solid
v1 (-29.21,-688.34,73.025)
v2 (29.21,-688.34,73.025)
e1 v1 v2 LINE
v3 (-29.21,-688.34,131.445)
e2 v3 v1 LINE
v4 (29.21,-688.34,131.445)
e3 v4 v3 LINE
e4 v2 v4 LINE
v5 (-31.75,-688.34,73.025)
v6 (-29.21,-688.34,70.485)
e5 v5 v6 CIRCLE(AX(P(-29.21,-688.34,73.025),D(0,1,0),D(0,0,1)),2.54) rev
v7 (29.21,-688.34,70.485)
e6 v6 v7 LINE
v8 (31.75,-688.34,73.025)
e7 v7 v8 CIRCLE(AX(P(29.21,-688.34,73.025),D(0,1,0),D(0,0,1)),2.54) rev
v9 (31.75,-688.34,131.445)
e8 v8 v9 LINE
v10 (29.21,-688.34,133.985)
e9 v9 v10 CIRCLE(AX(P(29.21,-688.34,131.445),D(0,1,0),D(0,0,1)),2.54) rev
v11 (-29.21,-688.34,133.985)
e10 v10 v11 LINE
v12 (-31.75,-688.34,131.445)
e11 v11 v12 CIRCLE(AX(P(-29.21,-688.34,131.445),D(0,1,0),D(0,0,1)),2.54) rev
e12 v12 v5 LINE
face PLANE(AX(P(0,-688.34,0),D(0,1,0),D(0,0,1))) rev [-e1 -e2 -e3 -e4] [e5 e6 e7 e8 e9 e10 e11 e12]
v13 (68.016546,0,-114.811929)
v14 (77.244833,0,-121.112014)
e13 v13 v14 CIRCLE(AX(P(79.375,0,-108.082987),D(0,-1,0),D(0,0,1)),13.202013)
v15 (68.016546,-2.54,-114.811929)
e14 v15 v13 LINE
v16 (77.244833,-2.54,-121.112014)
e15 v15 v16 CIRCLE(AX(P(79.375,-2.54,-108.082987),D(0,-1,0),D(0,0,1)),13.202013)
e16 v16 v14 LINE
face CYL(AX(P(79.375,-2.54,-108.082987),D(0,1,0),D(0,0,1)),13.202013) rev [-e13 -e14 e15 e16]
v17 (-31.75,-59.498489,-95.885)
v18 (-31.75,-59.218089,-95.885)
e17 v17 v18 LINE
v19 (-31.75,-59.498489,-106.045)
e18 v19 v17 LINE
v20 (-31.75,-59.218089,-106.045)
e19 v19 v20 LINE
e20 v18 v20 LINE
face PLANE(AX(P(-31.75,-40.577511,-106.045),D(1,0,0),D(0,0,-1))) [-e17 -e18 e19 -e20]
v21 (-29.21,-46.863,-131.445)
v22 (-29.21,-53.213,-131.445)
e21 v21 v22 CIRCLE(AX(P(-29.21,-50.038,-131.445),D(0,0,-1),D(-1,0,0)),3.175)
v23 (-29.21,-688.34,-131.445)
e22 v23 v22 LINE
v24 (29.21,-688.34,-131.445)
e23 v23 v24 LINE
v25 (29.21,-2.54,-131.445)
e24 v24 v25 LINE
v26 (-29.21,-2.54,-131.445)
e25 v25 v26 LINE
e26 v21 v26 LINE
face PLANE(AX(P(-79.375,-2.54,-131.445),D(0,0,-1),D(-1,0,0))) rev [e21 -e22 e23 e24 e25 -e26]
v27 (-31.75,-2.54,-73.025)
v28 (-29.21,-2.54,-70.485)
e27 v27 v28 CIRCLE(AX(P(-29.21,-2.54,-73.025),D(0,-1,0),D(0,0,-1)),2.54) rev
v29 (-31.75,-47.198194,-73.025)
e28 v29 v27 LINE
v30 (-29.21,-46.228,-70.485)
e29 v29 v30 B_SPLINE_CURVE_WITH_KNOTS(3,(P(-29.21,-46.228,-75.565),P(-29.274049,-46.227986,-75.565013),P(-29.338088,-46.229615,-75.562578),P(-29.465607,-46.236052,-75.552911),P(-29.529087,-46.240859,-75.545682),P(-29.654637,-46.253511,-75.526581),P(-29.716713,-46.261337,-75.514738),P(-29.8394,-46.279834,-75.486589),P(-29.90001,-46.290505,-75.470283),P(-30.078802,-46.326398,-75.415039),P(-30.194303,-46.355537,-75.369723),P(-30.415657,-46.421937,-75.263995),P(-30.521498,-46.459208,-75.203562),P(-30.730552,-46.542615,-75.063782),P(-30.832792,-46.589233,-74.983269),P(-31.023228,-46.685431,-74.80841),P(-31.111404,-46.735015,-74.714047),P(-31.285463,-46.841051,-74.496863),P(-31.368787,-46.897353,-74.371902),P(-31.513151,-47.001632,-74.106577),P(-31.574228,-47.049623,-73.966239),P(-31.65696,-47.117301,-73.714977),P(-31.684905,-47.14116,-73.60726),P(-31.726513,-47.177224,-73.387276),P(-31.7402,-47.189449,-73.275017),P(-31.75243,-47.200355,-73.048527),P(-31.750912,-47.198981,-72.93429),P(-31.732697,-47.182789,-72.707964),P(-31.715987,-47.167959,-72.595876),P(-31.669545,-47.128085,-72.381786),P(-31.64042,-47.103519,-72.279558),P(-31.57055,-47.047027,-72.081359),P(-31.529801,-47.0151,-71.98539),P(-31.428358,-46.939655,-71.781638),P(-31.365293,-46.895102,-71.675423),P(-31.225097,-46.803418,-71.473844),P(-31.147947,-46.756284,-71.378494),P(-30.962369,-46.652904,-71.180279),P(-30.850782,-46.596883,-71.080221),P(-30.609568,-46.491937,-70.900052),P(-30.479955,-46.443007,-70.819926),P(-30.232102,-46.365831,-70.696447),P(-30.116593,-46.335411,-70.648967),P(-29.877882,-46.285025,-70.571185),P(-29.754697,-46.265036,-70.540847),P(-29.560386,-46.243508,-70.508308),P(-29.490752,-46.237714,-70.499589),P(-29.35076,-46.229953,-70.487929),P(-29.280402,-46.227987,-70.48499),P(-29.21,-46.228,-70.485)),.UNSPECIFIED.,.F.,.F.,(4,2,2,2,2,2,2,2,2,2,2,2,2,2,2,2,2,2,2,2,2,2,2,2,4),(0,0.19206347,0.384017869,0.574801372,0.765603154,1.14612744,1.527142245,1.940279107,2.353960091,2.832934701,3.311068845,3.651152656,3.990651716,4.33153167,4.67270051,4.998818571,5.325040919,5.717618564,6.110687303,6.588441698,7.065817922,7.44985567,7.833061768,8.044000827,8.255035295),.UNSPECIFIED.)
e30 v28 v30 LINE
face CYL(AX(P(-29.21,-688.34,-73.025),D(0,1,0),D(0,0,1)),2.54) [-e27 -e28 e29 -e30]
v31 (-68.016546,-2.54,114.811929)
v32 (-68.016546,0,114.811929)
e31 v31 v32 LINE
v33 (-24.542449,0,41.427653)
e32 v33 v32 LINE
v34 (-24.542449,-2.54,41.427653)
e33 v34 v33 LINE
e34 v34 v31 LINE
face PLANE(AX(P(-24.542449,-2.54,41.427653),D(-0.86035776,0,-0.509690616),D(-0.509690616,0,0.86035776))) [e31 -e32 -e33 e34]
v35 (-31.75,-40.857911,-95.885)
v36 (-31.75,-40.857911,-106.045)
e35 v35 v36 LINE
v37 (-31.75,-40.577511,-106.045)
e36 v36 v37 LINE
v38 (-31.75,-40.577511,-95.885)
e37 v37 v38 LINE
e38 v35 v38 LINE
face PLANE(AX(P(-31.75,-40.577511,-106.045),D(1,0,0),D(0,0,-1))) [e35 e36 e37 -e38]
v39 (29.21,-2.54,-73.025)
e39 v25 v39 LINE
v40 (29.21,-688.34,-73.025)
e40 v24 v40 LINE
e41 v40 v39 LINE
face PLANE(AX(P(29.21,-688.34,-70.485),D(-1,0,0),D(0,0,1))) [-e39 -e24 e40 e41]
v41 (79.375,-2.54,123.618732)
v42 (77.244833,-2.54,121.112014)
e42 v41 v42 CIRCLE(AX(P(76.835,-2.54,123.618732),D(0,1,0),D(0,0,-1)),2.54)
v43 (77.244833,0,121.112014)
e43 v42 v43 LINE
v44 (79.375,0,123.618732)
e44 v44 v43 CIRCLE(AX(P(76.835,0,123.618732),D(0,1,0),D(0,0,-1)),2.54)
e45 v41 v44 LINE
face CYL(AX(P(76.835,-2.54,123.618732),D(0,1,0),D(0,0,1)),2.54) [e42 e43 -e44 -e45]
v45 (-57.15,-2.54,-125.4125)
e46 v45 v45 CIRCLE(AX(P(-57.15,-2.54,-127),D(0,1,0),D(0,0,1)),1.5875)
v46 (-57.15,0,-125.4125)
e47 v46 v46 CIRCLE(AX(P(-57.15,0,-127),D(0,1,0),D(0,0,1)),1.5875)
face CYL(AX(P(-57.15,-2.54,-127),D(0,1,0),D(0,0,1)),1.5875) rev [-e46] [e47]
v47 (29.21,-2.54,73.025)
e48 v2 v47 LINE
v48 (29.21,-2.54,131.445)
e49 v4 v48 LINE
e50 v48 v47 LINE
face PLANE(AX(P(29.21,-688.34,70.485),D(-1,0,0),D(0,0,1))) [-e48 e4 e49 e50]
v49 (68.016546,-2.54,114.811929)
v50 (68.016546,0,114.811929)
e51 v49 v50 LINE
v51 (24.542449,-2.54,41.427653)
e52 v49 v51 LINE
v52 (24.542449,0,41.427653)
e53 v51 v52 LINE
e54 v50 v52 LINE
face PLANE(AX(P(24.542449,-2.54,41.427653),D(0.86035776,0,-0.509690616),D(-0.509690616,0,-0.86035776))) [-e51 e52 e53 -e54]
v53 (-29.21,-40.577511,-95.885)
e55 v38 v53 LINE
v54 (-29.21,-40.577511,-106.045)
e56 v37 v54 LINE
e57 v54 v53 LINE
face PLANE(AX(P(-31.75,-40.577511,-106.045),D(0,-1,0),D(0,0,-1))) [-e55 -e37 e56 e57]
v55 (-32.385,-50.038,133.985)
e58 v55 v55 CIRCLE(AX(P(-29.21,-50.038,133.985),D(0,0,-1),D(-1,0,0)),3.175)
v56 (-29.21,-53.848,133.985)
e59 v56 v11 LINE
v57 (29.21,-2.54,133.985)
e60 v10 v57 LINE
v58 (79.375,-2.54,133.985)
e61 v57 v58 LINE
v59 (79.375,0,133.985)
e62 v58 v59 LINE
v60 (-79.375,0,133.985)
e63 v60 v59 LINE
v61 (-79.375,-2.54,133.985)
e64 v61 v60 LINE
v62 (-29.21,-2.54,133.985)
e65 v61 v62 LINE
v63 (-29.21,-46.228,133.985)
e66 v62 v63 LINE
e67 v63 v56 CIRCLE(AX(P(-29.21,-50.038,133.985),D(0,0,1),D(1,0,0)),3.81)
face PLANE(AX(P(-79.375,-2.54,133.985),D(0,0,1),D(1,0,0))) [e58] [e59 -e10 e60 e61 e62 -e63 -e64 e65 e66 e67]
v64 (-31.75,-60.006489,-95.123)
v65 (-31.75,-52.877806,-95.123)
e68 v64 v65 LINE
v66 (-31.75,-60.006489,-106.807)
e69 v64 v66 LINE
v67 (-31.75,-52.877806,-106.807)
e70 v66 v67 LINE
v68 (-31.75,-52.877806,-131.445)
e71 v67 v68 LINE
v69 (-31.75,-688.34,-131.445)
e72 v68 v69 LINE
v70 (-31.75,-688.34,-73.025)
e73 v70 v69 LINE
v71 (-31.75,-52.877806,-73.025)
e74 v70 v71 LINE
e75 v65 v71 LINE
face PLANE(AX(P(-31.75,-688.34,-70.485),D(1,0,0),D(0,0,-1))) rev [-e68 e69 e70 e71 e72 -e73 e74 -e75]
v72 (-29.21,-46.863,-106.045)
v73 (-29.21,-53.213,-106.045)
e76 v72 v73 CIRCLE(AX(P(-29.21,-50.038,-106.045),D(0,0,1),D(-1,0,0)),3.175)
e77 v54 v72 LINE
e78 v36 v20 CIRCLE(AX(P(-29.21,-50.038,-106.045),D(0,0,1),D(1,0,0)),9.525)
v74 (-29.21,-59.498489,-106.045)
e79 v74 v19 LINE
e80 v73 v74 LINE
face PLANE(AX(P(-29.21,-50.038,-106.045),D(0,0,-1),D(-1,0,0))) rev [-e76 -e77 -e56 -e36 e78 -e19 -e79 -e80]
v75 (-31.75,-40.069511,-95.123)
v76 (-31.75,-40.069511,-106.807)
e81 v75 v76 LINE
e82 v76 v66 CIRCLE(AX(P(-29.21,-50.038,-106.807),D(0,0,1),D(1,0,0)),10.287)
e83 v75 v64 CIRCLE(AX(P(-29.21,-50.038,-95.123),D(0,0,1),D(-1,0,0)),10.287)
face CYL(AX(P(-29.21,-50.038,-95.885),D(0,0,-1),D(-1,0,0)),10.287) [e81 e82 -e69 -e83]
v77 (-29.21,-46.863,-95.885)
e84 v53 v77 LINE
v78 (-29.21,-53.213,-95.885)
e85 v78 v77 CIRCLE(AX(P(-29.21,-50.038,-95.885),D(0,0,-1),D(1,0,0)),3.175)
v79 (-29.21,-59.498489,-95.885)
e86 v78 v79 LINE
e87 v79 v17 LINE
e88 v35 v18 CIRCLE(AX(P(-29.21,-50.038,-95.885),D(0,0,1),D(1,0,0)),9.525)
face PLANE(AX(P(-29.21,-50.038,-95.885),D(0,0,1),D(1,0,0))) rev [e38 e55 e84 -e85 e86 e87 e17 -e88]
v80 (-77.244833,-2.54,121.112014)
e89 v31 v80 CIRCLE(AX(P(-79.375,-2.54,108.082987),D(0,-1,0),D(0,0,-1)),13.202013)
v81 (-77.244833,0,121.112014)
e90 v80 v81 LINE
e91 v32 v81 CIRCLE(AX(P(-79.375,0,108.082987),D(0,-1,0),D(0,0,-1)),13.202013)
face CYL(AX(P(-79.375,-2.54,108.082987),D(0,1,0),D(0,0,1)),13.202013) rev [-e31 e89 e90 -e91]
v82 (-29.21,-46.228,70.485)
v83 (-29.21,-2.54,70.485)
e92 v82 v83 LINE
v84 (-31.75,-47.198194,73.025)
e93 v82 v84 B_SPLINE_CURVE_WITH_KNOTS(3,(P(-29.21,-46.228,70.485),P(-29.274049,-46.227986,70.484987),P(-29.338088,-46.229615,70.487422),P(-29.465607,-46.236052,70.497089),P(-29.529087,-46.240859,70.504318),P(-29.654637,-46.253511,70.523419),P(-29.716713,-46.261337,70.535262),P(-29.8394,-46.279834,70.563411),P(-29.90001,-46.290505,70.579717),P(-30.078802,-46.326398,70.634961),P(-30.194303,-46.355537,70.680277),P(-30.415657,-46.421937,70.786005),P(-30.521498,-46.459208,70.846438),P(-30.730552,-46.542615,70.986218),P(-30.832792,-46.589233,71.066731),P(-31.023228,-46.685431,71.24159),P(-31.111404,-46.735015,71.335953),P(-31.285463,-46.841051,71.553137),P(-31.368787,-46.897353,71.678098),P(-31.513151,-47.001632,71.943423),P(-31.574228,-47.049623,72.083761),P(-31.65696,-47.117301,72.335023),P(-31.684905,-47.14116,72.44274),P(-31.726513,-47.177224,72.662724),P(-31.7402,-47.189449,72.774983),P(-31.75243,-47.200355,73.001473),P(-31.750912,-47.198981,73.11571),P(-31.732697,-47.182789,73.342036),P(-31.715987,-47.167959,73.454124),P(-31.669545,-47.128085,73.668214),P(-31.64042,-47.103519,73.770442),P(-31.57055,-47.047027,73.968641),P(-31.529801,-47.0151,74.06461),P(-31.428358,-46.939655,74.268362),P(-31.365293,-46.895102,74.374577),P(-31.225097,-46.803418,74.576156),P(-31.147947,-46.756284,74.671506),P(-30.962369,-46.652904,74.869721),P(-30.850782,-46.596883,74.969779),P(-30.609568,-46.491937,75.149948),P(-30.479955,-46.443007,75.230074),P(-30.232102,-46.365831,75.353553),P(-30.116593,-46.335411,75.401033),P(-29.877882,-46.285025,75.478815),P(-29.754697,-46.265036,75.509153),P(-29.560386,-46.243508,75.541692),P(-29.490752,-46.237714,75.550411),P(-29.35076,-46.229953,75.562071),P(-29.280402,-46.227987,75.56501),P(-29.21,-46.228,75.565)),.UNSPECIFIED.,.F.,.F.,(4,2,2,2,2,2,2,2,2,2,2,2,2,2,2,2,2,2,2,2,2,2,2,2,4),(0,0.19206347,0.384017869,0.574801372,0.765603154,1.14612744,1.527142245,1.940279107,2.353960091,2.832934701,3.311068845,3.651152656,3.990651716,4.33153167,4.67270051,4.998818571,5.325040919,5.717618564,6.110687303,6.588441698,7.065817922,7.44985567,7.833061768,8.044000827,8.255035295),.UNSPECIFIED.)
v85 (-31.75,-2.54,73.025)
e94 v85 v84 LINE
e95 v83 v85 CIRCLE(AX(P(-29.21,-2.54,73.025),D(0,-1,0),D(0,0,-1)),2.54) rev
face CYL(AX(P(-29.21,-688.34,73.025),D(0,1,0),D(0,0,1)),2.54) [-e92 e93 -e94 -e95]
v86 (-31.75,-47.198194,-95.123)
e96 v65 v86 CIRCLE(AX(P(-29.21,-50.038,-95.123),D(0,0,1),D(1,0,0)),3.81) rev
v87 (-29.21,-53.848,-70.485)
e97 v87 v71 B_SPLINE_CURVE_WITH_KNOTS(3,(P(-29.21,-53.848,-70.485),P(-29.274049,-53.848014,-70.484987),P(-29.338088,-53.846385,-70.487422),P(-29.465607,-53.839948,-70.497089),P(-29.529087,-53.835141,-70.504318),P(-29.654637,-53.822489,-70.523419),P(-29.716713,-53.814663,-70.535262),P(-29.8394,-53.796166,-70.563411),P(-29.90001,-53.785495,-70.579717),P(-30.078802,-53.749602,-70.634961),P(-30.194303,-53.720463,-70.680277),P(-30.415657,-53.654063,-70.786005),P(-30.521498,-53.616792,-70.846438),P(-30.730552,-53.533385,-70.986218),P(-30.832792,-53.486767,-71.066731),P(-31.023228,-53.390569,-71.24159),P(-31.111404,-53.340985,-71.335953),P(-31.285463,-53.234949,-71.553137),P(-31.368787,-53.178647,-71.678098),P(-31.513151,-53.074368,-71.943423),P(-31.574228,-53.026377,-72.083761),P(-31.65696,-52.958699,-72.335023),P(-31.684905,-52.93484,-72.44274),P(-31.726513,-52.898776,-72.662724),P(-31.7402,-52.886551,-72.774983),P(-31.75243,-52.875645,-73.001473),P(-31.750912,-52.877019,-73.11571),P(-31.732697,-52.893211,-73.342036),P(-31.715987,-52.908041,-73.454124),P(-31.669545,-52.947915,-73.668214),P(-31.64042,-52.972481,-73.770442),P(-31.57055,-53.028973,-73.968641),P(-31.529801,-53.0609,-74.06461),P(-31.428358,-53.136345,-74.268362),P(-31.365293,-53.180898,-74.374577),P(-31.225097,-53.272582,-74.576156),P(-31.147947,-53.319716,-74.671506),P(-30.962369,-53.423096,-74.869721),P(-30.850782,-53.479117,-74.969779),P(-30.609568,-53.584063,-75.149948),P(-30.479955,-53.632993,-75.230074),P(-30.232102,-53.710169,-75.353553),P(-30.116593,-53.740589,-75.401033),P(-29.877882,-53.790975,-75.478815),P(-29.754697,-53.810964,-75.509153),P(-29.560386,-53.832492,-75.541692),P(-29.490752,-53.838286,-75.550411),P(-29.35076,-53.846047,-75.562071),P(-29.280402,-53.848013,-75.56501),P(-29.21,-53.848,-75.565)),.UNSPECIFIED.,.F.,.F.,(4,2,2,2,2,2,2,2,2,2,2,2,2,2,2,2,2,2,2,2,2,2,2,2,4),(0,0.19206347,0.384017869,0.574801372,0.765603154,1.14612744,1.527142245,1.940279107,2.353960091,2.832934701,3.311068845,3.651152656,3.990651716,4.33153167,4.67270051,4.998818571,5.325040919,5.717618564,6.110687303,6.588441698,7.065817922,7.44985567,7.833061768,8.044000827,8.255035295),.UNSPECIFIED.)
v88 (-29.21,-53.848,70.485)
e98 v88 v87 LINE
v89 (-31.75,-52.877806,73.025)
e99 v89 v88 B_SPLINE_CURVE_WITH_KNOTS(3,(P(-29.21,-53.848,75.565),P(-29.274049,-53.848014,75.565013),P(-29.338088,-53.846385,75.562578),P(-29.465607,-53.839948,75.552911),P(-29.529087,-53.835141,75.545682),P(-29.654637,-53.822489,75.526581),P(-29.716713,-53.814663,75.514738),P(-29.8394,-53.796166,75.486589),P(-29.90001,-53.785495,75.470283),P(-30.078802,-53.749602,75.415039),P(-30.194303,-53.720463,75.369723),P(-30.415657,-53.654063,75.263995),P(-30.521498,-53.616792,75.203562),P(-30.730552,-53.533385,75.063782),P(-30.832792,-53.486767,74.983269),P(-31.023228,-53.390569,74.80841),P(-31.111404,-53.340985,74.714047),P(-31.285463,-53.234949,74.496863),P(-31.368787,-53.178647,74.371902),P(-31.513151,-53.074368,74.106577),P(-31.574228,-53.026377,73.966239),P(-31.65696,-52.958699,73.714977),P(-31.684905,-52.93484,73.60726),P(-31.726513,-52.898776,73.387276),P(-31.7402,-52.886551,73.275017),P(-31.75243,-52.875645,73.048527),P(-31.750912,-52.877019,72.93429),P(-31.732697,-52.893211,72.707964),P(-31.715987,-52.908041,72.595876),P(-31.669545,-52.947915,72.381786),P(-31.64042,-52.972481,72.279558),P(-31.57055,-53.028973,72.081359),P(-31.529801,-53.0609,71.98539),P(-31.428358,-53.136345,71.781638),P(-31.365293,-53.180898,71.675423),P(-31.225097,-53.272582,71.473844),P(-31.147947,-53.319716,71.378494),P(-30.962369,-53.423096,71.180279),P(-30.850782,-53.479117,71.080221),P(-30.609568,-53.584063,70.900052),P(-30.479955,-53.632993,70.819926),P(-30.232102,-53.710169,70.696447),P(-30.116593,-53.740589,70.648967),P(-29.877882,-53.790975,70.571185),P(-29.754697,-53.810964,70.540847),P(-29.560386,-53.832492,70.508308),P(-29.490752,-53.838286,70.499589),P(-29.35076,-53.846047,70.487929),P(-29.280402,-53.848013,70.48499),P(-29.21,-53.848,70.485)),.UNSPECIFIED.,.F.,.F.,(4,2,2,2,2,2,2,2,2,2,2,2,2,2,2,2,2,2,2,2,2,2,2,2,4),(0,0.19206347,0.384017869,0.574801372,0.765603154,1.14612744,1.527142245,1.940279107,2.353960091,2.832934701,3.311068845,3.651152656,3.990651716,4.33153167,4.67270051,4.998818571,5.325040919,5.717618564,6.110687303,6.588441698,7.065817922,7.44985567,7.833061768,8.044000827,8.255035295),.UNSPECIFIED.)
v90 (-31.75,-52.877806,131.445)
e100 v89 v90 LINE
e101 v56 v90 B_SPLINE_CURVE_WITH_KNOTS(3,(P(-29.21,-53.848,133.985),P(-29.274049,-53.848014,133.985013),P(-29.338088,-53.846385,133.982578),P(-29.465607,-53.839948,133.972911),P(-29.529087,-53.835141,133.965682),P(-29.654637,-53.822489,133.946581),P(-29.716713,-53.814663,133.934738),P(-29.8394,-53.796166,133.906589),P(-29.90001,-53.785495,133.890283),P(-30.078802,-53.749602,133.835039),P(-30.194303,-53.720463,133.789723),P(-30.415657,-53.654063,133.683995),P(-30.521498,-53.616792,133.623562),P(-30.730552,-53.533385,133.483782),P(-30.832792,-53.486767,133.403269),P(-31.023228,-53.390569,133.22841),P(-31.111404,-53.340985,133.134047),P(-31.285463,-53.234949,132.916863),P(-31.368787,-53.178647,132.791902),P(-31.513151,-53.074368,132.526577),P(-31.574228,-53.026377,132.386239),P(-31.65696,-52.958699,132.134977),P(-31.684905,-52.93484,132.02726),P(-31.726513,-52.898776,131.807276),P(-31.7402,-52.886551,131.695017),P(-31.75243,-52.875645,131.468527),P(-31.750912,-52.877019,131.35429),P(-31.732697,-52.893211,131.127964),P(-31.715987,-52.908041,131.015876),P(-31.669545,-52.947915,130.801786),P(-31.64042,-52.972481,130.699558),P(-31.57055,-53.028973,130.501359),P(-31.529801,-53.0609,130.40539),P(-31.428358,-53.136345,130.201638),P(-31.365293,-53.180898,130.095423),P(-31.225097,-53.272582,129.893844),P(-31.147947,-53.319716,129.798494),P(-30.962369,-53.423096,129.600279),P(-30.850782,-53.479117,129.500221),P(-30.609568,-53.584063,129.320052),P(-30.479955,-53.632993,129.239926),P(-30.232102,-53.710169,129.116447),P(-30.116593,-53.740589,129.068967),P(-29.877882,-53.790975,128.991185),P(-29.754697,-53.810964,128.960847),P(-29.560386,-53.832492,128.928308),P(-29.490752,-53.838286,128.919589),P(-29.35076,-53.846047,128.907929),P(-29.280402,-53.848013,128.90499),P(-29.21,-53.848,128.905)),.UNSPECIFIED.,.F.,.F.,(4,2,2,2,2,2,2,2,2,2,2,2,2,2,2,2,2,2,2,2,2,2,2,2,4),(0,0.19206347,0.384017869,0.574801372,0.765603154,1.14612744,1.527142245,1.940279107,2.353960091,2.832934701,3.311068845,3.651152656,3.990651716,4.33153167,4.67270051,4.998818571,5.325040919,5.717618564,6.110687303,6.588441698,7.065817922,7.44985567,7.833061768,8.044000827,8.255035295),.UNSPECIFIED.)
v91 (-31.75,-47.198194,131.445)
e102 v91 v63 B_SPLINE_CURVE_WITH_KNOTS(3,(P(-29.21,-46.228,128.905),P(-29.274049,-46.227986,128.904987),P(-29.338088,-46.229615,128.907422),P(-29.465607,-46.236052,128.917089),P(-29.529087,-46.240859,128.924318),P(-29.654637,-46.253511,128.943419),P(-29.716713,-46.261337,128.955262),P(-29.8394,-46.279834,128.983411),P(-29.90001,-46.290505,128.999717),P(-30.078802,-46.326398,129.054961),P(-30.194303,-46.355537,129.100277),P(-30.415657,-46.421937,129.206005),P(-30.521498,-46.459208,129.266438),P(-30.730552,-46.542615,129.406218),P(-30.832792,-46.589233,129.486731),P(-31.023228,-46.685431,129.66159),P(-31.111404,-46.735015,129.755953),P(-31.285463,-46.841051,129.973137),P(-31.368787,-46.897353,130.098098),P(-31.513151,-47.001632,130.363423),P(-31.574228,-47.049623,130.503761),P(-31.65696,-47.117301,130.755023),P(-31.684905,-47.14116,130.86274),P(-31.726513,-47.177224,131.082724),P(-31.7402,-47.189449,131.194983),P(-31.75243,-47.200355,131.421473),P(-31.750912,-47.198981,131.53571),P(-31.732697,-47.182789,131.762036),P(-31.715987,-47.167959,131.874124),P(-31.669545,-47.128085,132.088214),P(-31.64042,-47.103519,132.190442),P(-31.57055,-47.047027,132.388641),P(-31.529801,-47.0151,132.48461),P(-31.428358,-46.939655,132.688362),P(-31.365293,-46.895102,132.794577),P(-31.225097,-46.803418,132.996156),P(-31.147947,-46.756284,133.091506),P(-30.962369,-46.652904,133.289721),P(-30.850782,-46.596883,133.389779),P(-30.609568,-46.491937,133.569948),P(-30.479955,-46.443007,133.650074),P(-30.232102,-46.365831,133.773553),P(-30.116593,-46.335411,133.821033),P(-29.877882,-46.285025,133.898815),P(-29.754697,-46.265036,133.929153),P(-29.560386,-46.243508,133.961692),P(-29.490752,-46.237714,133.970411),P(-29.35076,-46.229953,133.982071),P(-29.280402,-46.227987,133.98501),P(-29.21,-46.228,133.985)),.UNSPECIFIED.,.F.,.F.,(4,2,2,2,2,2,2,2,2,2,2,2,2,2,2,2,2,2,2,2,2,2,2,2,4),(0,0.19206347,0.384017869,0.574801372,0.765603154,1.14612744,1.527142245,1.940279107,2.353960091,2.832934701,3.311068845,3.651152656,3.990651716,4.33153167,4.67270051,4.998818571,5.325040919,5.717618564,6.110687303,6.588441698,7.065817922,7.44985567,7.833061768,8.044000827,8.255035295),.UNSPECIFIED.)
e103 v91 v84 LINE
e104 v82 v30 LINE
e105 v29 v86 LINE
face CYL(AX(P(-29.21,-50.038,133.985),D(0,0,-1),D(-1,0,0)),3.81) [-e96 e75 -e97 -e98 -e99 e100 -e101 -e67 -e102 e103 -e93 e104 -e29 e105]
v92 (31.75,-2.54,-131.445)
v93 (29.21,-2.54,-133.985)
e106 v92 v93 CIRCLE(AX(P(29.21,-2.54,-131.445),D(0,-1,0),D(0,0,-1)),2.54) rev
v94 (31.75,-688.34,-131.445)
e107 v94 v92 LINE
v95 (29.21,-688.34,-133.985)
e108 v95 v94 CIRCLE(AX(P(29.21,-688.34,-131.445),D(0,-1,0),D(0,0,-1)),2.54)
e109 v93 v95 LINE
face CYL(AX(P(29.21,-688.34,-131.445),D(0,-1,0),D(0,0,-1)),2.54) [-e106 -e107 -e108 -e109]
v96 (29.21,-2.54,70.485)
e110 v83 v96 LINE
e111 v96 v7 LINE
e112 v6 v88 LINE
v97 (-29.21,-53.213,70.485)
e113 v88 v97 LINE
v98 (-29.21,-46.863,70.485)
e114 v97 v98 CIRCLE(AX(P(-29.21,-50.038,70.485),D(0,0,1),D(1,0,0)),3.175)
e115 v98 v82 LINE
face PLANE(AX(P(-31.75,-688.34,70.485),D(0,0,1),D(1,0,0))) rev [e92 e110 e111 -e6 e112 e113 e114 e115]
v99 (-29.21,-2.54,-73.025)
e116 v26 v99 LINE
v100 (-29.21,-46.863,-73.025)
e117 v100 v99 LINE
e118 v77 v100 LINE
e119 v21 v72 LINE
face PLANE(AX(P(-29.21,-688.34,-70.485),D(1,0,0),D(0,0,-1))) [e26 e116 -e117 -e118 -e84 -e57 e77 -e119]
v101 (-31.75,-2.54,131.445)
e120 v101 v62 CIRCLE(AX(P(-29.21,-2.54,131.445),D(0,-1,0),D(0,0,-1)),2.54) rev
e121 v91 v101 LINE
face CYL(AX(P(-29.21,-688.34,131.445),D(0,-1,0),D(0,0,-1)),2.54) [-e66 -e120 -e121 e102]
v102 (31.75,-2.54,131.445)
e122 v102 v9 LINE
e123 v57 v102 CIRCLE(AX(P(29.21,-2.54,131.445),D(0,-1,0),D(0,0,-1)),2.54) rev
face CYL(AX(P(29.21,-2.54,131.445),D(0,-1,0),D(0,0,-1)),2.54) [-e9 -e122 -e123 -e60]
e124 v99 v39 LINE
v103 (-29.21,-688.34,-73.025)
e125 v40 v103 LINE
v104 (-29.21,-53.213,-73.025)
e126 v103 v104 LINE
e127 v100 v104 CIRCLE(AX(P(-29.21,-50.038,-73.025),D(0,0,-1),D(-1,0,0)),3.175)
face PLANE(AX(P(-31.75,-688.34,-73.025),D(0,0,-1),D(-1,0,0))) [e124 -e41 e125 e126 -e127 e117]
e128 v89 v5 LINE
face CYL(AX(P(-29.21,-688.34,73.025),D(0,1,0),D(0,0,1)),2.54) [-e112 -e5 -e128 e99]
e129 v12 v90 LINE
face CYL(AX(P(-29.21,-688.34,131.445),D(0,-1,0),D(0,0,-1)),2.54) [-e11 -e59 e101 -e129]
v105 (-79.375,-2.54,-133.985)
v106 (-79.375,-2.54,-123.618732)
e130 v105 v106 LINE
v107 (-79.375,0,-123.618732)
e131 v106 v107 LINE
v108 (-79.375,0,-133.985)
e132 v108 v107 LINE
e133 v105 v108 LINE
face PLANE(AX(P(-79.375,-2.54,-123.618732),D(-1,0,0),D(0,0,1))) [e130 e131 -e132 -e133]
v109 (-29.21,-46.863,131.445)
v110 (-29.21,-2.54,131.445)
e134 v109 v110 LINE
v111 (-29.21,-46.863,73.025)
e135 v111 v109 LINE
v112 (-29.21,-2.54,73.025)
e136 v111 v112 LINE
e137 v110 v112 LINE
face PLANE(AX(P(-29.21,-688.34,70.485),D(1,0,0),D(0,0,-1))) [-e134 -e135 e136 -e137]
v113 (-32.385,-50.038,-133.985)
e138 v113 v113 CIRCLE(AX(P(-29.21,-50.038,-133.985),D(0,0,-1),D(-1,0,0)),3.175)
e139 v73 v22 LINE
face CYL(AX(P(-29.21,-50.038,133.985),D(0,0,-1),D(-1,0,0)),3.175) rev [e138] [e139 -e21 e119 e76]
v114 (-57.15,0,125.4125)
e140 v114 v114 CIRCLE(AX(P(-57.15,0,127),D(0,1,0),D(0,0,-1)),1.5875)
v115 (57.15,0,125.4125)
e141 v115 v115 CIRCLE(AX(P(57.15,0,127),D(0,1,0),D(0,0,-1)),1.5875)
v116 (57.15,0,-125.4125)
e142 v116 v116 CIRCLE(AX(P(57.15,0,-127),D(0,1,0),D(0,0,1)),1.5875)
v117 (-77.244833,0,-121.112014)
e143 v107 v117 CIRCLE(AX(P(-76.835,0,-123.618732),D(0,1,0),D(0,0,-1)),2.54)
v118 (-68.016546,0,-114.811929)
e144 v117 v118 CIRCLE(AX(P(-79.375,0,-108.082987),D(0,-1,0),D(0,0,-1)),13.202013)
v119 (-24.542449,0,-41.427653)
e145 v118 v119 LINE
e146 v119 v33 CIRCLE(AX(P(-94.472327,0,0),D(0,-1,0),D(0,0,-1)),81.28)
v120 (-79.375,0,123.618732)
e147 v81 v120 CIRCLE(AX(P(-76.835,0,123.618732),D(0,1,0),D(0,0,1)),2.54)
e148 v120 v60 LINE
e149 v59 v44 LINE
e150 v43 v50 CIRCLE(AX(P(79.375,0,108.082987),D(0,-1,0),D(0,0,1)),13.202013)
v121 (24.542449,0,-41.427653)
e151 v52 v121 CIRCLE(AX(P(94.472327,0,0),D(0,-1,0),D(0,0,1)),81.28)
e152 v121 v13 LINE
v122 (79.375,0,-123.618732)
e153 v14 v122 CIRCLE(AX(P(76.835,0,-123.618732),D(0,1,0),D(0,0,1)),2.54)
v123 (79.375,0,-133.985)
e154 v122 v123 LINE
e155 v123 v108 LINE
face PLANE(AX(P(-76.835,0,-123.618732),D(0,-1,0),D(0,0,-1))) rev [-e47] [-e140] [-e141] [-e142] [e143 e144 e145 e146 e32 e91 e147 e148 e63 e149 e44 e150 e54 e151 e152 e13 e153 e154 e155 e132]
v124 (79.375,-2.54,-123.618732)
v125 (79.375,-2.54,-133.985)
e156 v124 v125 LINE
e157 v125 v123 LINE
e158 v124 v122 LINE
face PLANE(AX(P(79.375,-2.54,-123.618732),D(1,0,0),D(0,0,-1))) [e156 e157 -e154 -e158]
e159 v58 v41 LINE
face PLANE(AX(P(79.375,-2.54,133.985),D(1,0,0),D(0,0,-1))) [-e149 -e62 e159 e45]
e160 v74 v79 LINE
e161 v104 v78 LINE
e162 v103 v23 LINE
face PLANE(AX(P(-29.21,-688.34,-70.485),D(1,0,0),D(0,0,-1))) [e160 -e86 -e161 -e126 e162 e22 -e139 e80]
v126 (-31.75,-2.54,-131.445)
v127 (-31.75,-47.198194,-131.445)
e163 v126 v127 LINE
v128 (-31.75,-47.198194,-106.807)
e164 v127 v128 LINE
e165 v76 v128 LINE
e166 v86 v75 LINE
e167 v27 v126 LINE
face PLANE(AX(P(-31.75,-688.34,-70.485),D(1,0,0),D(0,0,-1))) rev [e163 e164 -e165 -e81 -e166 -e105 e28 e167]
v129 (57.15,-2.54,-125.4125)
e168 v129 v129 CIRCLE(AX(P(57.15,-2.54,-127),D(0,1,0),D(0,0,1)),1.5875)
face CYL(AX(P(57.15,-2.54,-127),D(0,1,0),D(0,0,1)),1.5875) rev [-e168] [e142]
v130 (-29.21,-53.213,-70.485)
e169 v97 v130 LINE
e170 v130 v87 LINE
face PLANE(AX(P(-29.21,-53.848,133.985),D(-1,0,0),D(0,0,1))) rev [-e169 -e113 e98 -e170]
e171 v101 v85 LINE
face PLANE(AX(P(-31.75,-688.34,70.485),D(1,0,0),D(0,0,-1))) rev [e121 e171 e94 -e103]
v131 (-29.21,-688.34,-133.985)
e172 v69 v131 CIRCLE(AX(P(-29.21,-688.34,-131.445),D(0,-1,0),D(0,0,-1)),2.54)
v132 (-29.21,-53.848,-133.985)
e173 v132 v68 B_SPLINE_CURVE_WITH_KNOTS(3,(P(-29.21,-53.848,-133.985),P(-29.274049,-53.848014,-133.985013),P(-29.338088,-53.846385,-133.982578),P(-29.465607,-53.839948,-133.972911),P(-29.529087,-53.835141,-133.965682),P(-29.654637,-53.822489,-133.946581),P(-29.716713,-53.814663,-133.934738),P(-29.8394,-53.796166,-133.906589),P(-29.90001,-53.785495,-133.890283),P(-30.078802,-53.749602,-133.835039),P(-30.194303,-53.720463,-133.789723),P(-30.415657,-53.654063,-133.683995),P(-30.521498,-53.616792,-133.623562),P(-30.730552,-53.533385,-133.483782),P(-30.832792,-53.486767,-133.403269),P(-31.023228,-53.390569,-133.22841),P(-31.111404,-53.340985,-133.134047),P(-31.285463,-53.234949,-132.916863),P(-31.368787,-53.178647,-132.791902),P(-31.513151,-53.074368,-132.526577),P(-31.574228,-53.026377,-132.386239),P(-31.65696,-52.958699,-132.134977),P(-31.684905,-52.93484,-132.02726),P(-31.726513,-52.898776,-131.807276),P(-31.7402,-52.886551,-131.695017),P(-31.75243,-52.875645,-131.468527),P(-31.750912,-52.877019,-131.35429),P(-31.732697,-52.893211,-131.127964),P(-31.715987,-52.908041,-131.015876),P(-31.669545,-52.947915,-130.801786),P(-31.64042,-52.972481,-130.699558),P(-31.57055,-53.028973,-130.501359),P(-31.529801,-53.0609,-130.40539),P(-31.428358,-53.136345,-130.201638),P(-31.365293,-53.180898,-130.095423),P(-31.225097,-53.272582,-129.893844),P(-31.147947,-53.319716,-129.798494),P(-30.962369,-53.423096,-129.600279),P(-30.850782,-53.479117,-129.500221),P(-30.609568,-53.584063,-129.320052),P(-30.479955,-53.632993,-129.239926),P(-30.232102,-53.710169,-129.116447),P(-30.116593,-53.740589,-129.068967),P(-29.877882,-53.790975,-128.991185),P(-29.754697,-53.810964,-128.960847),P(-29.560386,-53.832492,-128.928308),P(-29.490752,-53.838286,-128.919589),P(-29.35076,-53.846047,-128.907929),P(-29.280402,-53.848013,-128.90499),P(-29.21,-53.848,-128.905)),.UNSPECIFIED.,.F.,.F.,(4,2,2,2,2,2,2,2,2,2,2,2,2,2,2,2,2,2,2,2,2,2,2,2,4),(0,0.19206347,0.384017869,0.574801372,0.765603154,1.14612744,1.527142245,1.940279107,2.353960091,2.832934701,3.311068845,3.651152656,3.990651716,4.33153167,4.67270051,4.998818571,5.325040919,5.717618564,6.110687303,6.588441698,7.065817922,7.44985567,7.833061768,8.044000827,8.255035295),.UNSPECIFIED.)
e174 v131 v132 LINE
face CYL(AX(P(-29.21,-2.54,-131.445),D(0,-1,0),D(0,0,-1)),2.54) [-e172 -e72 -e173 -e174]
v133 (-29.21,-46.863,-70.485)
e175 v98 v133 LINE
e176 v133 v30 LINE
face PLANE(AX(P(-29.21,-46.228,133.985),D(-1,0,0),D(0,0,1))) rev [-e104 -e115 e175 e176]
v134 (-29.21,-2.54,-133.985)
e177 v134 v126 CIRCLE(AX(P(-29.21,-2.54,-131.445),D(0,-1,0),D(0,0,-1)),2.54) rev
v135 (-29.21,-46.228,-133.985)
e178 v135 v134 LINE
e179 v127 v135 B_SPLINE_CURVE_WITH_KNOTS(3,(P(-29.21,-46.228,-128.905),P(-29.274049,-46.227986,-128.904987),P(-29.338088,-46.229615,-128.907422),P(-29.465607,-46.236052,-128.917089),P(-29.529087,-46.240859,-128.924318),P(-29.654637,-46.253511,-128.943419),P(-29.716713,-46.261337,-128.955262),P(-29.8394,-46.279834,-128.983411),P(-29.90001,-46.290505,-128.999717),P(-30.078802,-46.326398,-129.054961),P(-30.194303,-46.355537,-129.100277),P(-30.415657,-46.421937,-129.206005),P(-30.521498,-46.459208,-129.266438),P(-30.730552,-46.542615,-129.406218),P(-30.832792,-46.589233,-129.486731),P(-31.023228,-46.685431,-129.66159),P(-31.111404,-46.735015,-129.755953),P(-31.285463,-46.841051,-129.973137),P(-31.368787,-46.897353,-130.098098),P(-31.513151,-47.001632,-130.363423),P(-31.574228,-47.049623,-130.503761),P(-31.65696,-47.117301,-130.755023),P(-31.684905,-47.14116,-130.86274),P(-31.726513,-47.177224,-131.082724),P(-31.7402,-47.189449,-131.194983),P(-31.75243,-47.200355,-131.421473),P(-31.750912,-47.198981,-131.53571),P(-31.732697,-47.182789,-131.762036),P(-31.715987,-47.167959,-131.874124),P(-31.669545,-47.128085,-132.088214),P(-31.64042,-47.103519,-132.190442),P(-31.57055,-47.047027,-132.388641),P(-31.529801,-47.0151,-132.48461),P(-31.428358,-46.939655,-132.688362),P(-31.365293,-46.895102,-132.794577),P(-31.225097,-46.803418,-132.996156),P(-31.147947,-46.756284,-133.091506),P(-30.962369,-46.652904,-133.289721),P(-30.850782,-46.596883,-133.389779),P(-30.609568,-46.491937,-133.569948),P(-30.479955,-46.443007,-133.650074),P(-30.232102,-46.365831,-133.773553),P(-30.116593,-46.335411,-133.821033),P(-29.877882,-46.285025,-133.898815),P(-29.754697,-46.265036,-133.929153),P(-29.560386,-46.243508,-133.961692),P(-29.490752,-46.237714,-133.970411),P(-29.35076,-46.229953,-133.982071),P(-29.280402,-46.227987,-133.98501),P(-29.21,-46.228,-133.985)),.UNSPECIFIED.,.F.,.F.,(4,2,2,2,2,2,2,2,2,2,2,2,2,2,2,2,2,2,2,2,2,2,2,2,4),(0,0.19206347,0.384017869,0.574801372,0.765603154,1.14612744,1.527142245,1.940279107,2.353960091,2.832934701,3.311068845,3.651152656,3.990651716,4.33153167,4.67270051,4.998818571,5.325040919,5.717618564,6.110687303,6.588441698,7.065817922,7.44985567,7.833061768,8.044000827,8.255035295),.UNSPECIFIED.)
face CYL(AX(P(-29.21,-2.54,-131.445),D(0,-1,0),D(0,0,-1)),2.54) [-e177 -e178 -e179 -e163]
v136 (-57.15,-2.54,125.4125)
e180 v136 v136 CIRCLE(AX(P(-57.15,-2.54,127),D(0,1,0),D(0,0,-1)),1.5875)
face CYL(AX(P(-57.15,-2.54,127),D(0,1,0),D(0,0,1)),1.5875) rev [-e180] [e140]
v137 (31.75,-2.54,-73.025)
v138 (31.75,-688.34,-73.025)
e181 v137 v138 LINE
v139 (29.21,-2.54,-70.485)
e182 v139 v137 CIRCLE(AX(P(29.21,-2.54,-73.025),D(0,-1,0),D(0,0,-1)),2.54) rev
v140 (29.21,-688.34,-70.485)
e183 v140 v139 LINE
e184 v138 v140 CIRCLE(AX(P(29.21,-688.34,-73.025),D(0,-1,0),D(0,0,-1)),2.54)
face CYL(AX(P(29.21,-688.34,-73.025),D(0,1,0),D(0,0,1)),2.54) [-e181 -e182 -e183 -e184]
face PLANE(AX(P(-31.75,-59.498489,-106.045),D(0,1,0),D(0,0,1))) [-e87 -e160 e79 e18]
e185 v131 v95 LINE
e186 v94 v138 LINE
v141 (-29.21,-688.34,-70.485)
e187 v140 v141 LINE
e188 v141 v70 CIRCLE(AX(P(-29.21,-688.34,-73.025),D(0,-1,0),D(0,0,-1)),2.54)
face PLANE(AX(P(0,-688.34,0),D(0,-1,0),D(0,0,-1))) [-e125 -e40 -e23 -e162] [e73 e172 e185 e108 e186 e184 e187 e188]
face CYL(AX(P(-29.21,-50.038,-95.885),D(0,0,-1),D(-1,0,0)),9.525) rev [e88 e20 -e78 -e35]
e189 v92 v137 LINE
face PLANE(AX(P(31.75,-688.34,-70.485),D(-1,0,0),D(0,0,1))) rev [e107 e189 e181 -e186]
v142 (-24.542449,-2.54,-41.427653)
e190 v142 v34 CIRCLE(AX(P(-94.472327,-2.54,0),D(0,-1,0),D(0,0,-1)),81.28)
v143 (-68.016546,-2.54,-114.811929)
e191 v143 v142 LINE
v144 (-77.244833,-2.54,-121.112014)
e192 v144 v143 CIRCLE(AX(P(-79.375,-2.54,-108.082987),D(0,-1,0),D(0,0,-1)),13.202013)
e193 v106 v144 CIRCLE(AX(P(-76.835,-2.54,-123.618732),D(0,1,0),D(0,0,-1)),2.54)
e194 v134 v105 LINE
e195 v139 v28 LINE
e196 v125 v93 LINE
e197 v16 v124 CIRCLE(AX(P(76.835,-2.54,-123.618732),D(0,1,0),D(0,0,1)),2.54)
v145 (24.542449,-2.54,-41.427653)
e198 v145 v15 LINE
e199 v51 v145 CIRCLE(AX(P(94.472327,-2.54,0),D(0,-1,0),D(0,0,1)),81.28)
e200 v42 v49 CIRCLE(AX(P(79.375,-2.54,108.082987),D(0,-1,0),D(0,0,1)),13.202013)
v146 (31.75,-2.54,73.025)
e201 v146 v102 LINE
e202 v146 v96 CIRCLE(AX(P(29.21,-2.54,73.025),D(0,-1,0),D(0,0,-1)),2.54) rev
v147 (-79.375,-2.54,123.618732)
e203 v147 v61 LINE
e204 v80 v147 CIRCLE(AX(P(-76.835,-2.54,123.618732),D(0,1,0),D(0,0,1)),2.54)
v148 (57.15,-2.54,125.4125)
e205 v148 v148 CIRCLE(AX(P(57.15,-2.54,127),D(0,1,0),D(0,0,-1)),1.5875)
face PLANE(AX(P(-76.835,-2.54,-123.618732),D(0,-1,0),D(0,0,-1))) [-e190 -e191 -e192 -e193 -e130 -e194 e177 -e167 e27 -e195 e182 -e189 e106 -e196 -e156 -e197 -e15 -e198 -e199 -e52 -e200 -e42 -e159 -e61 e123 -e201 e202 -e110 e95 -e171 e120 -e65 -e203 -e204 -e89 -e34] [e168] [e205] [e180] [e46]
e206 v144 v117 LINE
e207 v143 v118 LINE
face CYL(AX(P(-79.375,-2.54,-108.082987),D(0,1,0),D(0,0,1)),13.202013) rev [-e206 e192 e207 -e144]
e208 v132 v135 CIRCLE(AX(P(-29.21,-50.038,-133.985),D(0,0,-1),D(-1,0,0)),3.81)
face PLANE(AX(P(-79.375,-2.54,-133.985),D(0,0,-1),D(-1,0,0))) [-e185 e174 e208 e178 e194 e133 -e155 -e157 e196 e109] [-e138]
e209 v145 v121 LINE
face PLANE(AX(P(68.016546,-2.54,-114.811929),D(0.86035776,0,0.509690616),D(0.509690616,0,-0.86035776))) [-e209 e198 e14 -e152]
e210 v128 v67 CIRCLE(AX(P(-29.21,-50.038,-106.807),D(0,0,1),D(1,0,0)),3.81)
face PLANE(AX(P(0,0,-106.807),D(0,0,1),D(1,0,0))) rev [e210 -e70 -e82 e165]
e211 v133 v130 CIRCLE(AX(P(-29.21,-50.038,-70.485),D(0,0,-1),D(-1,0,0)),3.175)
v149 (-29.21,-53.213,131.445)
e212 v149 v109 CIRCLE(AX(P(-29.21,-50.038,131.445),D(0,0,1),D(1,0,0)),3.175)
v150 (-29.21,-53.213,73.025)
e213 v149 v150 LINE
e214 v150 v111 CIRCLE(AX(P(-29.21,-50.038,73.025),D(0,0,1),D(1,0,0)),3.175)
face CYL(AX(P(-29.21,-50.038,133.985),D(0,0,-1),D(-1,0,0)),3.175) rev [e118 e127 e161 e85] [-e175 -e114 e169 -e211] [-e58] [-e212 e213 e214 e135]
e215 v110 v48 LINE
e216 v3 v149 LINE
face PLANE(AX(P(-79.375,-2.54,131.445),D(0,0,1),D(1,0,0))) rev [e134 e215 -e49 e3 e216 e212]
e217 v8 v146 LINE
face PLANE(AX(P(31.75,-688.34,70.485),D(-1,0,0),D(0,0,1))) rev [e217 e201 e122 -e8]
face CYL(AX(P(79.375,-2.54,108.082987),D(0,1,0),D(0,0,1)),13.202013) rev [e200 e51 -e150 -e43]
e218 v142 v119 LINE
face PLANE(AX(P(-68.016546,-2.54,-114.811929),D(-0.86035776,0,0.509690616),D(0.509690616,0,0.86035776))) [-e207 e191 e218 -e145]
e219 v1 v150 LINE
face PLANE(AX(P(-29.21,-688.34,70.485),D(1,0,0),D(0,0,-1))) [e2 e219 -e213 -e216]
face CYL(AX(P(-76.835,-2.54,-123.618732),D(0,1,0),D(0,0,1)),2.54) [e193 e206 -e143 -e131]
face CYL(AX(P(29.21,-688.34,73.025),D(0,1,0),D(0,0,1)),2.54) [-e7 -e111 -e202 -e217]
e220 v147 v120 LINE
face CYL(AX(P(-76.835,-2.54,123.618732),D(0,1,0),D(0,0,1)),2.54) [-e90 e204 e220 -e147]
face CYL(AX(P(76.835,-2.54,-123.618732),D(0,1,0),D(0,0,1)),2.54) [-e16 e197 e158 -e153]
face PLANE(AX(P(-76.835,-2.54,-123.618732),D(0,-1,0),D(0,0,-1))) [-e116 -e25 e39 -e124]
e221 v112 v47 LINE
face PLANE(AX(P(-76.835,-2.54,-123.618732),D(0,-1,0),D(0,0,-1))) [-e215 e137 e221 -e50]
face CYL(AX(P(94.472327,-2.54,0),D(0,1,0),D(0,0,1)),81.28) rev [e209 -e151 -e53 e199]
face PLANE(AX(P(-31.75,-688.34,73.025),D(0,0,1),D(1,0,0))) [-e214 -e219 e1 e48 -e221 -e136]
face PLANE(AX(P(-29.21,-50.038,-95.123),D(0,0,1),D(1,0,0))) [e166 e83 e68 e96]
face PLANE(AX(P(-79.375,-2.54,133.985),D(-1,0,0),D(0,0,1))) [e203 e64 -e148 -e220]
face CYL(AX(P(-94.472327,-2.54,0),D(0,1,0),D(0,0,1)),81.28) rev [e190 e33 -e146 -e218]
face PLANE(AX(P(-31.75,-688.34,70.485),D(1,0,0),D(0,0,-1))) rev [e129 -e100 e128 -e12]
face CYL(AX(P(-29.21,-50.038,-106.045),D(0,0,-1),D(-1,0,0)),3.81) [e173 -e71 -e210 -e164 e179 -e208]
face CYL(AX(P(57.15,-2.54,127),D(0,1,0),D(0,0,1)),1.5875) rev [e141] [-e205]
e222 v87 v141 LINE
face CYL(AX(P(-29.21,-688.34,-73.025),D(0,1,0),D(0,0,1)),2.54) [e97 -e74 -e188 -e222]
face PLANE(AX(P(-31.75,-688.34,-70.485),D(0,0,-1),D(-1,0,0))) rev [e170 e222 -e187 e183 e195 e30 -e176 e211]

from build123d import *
from build123d.topology import SkipClean

# Parameters (mm, degrees)
SKETCH1_R           = 1.5875
BOSS_EXTRUDE1_DEPTH = 2.54
SKETCH2_W           = 63.5
SKETCH2_H           = 63.5
BOSS_EXTRUDE2_DEPTH = 685.8
SHELL1_START        = -688.34
SHELL1_OUTLINE_W    = 58.42
SHELL1_OUTLINE_H    = 58.42
SHELL1_DEPTH        = 685.8
FILLET1_R           = 2.54
FILLET2_R           = 2.54
CUT_EXTRUDE1_DEPTH  = 267.97
BOSS_EXTRUDE4_DEPTH = 27.94
BOSS_EXTRUDE5_DEPTH = 10.16
BOSS_EXTRUDE6_START = -0.762
BOSS_EXTRUDE6_DEPTH = 0.762
BOSS_EXTRUDE7_DEPTH = 0.762
BOSS_EXTRUDE8_DEPTH = 229.108
SKETCH12_W          = 2.54
SKETCH12_H          = 18.920978
CUT_EXTRUDE2_DEPTH  = 10.16


# Read off the part's stored shape, not the designer's step: Shell1
with BuildPart() as part:
    # Sketch1 → Boss-Extrude1 (new body)
    with BuildSketch(Plane(origin=(0, 0, 0), x_dir=(1, 0, 0), z_dir=(0, 1, 0))):
        with BuildLine():
            Line((-79.375, -133.985), (79.375, -133.985))
            Line((79.375, -133.985), (79.375, -123.618732))
            ThreePointArc((79.375, -123.618732), (78.770533, -121.973949), (77.244833, -121.112014))
            ThreePointArc((77.244833, -121.112014), (71.931312, -118.986411), (68.016546, -114.811929))
            Line((68.016546, -114.811929), (24.542449, -41.427653))
            ThreePointArc((24.542449, -41.427653), (13.192327, 0), (24.542449, 41.427653))
            Line((24.542449, 41.427653), (68.016546, 114.811929))
            ThreePointArc((68.016546, 114.811929), (71.931312, 118.986411), (77.244833, 121.112014))
            ThreePointArc((77.244833, 121.112014), (78.770533, 121.973949), (79.375, 123.618732))
            Line((79.375, 123.618732), (79.375, 133.985))
            Line((79.375, 133.985), (-79.375, 133.985))
            Line((-79.375, 133.985), (-79.375, 123.618732))
            ThreePointArc((-79.375, 123.618732), (-78.770533, 121.973949), (-77.244833, 121.112014))
            ThreePointArc((-77.244833, 121.112014), (-71.931312, 118.986411), (-68.016546, 114.811929))
            Line((-68.016546, 114.811929), (-24.542449, 41.427653))
            ThreePointArc((-24.542449, 41.427653), (-13.192327, 0), (-24.542449, -41.427653))
            Line((-24.542449, -41.427653), (-68.016546, -114.811929))
            ThreePointArc((-68.016546, -114.811929), (-71.931312, -118.986411), (-77.244833, -121.112014))
            ThreePointArc((-77.244833, -121.112014), (-78.770533, -121.973949), (-79.375, -123.618732))
            Line((-79.375, -123.618732), (-79.375, -133.985))
        make_face()
        with Locations(Location((-57.15, 127, 0), (0, 0, 270))):
            Circle(SKETCH1_R, mode=Mode.SUBTRACT)
        with Locations(Location((57.15, 127, 0), (0, 0, 270))):
            Circle(SKETCH1_R, mode=Mode.SUBTRACT)
        with Locations(Location((57.15, -127, 0), (0, 0, 90))):
            Circle(SKETCH1_R, mode=Mode.SUBTRACT)
        with Locations(Location((-57.15, -127, 0), (0, 0, 90))):
            Circle(SKETCH1_R, mode=Mode.SUBTRACT)
    extrude(amount=-BOSS_EXTRUDE1_DEPTH)

    # Sketch2 → Boss-Extrude2 (add)
    with BuildSketch(Plane.XZ.offset(2.54)):
        with Locations((0, -102.235)):
            Rectangle(SKETCH2_W, SKETCH2_H)
        with Locations((0, 102.235)):
            Rectangle(SKETCH2_W, SKETCH2_H)
    extrude(amount=BOSS_EXTRUDE2_DEPTH)

    # Shell1 outline → Shell1 (cut)
    with BuildSketch(Plane(origin=(0, 0, 0), x_dir=(1, 0, 0), z_dir=(0, 1, 0)).offset(SHELL1_START)):
        with Locations((0, 102.235)):
            Rectangle(SHELL1_OUTLINE_W, SHELL1_OUTLINE_H)
        with Locations((0, -102.235)):
            Rectangle(SHELL1_OUTLINE_W, SHELL1_OUTLINE_H)
    extrude(amount=SHELL1_DEPTH, mode=Mode.SUBTRACT)

    # Fillet1
    fillet1_edges = [part.edges().sort_by_distance(p)[0] for p in [
        (31.75, -345.44, 70.485),
        (31.75, -345.44, 133.985),
        (-31.75, -345.44, 133.985),
        (-31.75, -345.44, 70.485),
    ]]
    fillet(fillet1_edges, radius=FILLET1_R)

    # Fillet2
    fillet2_edges = [part.edges().sort_by_distance(p)[0] for p in [
        (-31.75, -345.44, -70.485),
        (-31.75, -345.44, -133.985),
        (31.75, -345.44, -133.985),
        (31.75, -345.44, -70.485),
    ]]
    fillet(fillet2_edges, radius=FILLET2_R)

    # Sketch4 → Cut-Extrude1 (cut)
    with BuildSketch(Plane(origin=(0, 0, -133.985), x_dir=(-1, 0, 0), z_dir=(0, 0, -1))):
        with BuildLine():
            ThreePointArc((29.21, -53.213), (31.455064, -52.283064), (32.385, -50.038))
            ThreePointArc((32.385, -50.038), (31.455064, -47.792936), (29.21, -46.863))
            Line((29.21, -46.863), (29.21, -53.213))
        make_face()
        with BuildLine():
            Line((29.21, -53.213), (29.21, -46.863))
            ThreePointArc((29.21, -46.863), (26.035, -50.038), (29.21, -53.213))
        make_face()
    extrude(amount=-CUT_EXTRUDE1_DEPTH, mode=Mode.SUBTRACT)

    # Sketch6 → Boss-Extrude4 (add)
    with BuildSketch(Plane(origin=(0, 0, -133.985), x_dir=(-1, 0, 0), z_dir=(0, 0, -1))):
        with BuildLine():
            Line((29.21, -46.863), (29.21, -46.228))
            ThreePointArc((29.21, -46.228), (33.02, -50.038), (29.21, -53.848))
            Line((29.21, -53.848), (29.21, -53.213))
            ThreePointArc((29.21, -53.213), (32.385, -50.038), (29.21, -46.863))
        make_face()
    extrude(amount=-BOSS_EXTRUDE4_DEPTH)

    # Sketch7 → Boss-Extrude5 (add)
    with BuildSketch(Plane.XY.offset(-106.045)):
        with BuildLine():
            ThreePointArc((-31.75, -40.069511), (-39.497, -50.038), (-31.75, -60.006489))
            Line((-31.75, -60.006489), (-31.75, -59.218089))
            ThreePointArc((-31.75, -59.218089), (-38.735, -50.038), (-31.75, -40.857911))
            Line((-31.75, -40.857911), (-31.75, -40.069511))
        make_face()
    extrude(amount=BOSS_EXTRUDE5_DEPTH)

    # Sketch7<2> → Boss-Extrude6 (add)
    with BuildSketch(Plane.XY.offset(-106.045).offset(BOSS_EXTRUDE6_START)):
        with BuildLine():
            ThreePointArc((-31.75, -40.069511), (-39.497, -50.038), (-31.75, -60.006489))
            Line((-31.75, -60.006489), (-31.75, -59.218089))
            ThreePointArc((-31.75, -59.218089), (-38.735, -50.038), (-31.75, -40.857911))
            Line((-31.75, -40.857911), (-31.75, -40.069511))
        make_face()
        with BuildLine():
            ThreePointArc((-31.75, -40.857911), (-38.735, -50.038), (-31.75, -59.218089))
            Line((-31.75, -59.218089), (-31.75, -52.877806))
            ThreePointArc((-31.75, -52.877806), (-33.02, -50.038), (-31.75, -47.198194))
            Line((-31.75, -47.198194), (-31.75, -40.857911))
        make_face()
    extrude(amount=BOSS_EXTRUDE6_DEPTH)

    # Sketch8 → Boss-Extrude7 (add)
    with SkipClean():  # the faces are left unmerged after this step: merging them gives an invalid solid
        with BuildSketch(Plane.XY.offset(-95.885)):
            with BuildLine():
                Line((-31.75, -40.069511), (-31.75, -48.133))
                ThreePointArc((-31.75, -48.133), (-32.385, -50.038), (-31.75, -51.943))
                Line((-31.75, -51.943), (-31.75, -60.006489))
                ThreePointArc((-31.75, -60.006489), (-39.497, -50.038), (-31.75, -40.069511))
            make_face()
        extrude(amount=BOSS_EXTRUDE7_DEPTH)

    # Sketch9 → Boss-Extrude8 (add)
    with SkipClean():  # the faces are left unmerged after this step: merging them gives an invalid solid
        with BuildSketch(Plane.XY.offset(-95.123)):
            with BuildLine():
                Line((-29.21, -46.228), (-29.21, -46.863))
                ThreePointArc((-29.21, -46.863), (-30.629903, -47.198194), (-31.75, -48.133))
                ThreePointArc((-31.75, -48.133), (-32.385, -50.038), (-31.75, -51.943))
                ThreePointArc((-31.75, -51.943), (-30.629903, -52.877806), (-29.21, -53.213))
                Line((-29.21, -53.213), (-29.21, -53.848))
                ThreePointArc((-29.21, -53.848), (-33.02, -50.038), (-29.21, -46.228))
            make_face()
        extrude(amount=BOSS_EXTRUDE8_DEPTH)

    # Sketch12 → Cut-Extrude2 (cut)
    with BuildSketch(Plane(origin=(0, 0, -95.885), x_dir=(-1, 0, 0), z_dir=(0, 0, -1))):
        with Locations((30.48, -50.038)):
            Rectangle(SKETCH12_W, SKETCH12_H)
    extrude(amount=CUT_EXTRUDE2_DEPTH, mode=Mode.SUBTRACT)


solid = part.part
